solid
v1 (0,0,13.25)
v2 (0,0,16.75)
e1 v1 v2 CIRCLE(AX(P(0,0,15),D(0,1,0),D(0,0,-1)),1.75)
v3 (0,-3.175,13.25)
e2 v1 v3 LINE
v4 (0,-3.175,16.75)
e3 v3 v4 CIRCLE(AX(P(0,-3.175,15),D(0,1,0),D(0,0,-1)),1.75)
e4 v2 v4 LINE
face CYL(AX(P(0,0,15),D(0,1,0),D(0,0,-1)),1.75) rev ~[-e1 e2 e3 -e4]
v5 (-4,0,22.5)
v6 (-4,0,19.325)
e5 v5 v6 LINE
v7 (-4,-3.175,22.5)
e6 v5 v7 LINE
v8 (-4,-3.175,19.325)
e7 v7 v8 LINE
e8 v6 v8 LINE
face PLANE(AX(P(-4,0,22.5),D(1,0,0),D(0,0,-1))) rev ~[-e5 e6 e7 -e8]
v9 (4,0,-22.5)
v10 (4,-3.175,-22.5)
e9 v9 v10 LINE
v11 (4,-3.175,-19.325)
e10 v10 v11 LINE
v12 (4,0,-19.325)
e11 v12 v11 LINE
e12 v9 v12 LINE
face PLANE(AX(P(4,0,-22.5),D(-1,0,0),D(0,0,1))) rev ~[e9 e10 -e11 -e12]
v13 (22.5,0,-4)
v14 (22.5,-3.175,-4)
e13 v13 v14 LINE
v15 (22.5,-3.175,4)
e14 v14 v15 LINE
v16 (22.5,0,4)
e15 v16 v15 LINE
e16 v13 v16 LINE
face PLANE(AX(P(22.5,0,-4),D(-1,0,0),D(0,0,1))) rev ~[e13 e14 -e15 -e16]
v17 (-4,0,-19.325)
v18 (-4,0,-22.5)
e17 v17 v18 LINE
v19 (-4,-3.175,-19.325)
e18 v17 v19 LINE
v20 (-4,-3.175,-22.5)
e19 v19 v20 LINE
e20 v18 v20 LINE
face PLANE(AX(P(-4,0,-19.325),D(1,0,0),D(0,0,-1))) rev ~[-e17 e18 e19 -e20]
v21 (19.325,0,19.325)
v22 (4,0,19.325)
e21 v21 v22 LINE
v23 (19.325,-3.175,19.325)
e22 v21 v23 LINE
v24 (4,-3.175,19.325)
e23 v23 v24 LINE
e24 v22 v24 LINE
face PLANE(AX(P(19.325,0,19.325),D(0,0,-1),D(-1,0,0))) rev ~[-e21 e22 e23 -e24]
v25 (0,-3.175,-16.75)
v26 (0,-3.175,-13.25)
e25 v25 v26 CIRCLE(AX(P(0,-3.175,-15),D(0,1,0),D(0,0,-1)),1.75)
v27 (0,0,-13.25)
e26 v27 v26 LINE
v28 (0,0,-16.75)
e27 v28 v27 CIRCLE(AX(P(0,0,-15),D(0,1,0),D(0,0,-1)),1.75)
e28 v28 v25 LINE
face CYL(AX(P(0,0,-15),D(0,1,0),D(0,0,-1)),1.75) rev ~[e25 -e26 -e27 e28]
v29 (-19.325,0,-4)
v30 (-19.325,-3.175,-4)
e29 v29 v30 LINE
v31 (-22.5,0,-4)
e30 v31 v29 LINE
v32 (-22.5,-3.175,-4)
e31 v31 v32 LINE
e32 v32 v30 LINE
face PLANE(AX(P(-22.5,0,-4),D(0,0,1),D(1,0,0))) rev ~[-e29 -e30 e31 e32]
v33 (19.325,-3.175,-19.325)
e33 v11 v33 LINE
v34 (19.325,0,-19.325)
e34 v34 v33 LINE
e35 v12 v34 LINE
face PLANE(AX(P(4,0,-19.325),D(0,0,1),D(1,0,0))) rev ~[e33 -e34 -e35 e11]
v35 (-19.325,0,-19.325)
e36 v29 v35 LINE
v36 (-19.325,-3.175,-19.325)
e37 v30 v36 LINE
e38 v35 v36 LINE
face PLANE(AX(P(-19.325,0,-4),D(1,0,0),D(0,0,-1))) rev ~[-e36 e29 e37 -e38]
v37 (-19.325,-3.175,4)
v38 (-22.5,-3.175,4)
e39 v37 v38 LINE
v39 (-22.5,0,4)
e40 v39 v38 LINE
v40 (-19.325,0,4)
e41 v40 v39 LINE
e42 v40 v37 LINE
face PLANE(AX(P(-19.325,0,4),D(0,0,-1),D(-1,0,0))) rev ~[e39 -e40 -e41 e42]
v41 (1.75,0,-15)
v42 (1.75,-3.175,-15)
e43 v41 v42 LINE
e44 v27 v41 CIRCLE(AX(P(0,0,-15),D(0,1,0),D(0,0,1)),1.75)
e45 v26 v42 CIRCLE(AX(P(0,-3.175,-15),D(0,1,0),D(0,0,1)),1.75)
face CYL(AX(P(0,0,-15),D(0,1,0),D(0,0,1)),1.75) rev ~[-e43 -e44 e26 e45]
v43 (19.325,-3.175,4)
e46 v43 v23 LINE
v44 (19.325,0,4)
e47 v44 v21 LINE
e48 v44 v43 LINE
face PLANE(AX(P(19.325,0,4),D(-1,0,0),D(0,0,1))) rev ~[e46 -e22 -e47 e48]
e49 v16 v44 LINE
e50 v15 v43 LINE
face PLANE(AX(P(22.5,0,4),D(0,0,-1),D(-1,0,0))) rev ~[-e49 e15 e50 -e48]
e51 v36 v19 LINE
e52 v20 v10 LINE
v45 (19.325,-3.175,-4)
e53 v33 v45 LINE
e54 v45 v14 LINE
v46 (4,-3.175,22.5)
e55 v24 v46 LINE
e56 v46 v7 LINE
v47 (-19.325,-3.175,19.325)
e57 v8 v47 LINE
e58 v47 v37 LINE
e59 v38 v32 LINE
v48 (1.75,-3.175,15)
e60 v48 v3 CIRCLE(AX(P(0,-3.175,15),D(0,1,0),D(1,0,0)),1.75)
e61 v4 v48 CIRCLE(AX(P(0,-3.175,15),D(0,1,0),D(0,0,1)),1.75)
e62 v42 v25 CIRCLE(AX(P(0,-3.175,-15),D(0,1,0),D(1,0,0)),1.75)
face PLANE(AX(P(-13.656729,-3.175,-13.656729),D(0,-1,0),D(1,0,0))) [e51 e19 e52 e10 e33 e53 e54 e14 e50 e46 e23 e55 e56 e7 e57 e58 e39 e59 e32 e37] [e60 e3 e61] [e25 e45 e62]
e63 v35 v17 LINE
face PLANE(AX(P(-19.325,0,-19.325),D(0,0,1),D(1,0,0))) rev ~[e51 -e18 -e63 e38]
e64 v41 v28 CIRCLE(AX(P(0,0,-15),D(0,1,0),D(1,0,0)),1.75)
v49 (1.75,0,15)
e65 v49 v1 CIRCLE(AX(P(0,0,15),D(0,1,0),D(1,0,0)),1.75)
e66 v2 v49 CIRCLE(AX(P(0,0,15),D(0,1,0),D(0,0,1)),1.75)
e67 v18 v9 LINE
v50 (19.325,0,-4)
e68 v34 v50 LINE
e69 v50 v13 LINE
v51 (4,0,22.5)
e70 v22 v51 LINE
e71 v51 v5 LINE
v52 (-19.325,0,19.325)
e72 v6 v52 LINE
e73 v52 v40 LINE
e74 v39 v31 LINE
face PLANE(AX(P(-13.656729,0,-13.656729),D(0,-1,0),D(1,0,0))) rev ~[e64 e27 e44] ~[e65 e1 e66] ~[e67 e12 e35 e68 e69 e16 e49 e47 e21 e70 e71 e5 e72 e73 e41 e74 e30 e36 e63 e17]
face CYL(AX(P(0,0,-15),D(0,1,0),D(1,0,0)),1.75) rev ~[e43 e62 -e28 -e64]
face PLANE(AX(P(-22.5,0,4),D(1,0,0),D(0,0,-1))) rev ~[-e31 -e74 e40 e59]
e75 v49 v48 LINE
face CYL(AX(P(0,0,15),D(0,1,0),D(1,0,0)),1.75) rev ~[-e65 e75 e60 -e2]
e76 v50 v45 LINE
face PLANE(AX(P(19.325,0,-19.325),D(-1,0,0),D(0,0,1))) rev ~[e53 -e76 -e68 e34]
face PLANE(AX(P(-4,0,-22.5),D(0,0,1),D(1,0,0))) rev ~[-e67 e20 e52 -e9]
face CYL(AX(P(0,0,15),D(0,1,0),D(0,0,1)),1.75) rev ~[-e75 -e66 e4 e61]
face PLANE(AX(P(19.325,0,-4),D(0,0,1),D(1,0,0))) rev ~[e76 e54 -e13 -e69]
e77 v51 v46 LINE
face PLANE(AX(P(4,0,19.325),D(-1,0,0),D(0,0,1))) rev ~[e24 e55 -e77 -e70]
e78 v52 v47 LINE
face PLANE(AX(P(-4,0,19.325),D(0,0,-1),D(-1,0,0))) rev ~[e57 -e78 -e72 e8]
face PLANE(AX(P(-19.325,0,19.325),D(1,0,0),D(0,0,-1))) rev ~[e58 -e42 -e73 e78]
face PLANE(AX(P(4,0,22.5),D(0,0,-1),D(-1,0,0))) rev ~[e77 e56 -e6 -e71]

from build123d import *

# Parameters (mm, degrees)
F1_DEPTH = 3.175


# Not quite as in the source:
# - a length typed as a fraction of an inch, garbled in the dataset ("3 / 203.2 mm" for 3/8 in), is restored


with BuildPart() as f1:
    # F0 (on Front) → F1 (new body)
    with BuildSketch(Plane.XZ):
        Polygon((-22.5, -4), (-19.325, -4), (-19.325, -19.325), (-4, -19.325), (-4, -22.5), (0, -22.5), (0, -18), (-18, -18), (-18, 0), (-22.5, 0), align=None)
        Polygon((-22.5, 4), (-22.5, 0), (-18, 0), (-18, 18), (0, 18), (0, 22.5), (-4, 22.5), (-4, 19.325), (-19.325, 19.325), (-19.325, 4), align=None)
        Polygon((0, -18), (0, -22.5), (4, -22.5), (4, -19.325), (19.325, -19.325), (19.325, -4), (22.5, -4), (22.5, 0), (18, 0), (18, -18), align=None)
        Polygon((18, 18), (18, 0), (22.5, 0), (22.5, 4), (19.325, 4), (19.325, 19.325), (4, 19.325), (4, 22.5), (0, 22.5), (0, 18), align=None)
        with BuildLine():
            Line((-18, 18), (-18, 0))
            Line((-18, 0), (0, 0))
            Line((0, 0), (0, 13.25))
            ThreePointArc((0, 13.25), (-1.75, 15), (0, 16.75))
            Line((0, 16.75), (0, 18))
            Line((0, 18), (-18, 18))
        make_face()
        with BuildLine():
            Line((0, 13.25), (0, 0))
            Line((0, 0), (18, 0))
            Line((18, 0), (18, 18))
            Line((18, 18), (0, 18))
            Line((0, 18), (0, 16.75))
            ThreePointArc((0, 16.75), (1.2374368671, 16.2374368671), (1.75, 15))
            ThreePointArc((1.75, 15), (1.2374368671, 13.7625631329), (0, 13.25))
        make_face()
        with BuildLine():
            Line((18, 0), (0, 0))
            Line((0, 0), (0, -13.25))
            ThreePointArc((0, -13.25), (1.2374368671, -13.7625631329), (1.75, -15))
            ThreePointArc((1.75, -15), (1.2374368671, -16.2374368671), (0, -16.75))
            Line((0, -16.75), (0, -18))
            Line((0, -18), (18, -18))
            Line((18, -18), (18, 0))
        make_face()
        with BuildLine():
            Line((0, 0), (-18, 0))
            Line((-18, 0), (-18, -18))
            Line((-18, -18), (0, -18))
            Line((0, -18), (0, -16.75))
            ThreePointArc((0, -16.75), (-1.75, -15), (0, -13.25))
            Line((0, -13.25), (0, 0))
        make_face()
    extrude(amount=F1_DEPTH)


solid = f1.part
